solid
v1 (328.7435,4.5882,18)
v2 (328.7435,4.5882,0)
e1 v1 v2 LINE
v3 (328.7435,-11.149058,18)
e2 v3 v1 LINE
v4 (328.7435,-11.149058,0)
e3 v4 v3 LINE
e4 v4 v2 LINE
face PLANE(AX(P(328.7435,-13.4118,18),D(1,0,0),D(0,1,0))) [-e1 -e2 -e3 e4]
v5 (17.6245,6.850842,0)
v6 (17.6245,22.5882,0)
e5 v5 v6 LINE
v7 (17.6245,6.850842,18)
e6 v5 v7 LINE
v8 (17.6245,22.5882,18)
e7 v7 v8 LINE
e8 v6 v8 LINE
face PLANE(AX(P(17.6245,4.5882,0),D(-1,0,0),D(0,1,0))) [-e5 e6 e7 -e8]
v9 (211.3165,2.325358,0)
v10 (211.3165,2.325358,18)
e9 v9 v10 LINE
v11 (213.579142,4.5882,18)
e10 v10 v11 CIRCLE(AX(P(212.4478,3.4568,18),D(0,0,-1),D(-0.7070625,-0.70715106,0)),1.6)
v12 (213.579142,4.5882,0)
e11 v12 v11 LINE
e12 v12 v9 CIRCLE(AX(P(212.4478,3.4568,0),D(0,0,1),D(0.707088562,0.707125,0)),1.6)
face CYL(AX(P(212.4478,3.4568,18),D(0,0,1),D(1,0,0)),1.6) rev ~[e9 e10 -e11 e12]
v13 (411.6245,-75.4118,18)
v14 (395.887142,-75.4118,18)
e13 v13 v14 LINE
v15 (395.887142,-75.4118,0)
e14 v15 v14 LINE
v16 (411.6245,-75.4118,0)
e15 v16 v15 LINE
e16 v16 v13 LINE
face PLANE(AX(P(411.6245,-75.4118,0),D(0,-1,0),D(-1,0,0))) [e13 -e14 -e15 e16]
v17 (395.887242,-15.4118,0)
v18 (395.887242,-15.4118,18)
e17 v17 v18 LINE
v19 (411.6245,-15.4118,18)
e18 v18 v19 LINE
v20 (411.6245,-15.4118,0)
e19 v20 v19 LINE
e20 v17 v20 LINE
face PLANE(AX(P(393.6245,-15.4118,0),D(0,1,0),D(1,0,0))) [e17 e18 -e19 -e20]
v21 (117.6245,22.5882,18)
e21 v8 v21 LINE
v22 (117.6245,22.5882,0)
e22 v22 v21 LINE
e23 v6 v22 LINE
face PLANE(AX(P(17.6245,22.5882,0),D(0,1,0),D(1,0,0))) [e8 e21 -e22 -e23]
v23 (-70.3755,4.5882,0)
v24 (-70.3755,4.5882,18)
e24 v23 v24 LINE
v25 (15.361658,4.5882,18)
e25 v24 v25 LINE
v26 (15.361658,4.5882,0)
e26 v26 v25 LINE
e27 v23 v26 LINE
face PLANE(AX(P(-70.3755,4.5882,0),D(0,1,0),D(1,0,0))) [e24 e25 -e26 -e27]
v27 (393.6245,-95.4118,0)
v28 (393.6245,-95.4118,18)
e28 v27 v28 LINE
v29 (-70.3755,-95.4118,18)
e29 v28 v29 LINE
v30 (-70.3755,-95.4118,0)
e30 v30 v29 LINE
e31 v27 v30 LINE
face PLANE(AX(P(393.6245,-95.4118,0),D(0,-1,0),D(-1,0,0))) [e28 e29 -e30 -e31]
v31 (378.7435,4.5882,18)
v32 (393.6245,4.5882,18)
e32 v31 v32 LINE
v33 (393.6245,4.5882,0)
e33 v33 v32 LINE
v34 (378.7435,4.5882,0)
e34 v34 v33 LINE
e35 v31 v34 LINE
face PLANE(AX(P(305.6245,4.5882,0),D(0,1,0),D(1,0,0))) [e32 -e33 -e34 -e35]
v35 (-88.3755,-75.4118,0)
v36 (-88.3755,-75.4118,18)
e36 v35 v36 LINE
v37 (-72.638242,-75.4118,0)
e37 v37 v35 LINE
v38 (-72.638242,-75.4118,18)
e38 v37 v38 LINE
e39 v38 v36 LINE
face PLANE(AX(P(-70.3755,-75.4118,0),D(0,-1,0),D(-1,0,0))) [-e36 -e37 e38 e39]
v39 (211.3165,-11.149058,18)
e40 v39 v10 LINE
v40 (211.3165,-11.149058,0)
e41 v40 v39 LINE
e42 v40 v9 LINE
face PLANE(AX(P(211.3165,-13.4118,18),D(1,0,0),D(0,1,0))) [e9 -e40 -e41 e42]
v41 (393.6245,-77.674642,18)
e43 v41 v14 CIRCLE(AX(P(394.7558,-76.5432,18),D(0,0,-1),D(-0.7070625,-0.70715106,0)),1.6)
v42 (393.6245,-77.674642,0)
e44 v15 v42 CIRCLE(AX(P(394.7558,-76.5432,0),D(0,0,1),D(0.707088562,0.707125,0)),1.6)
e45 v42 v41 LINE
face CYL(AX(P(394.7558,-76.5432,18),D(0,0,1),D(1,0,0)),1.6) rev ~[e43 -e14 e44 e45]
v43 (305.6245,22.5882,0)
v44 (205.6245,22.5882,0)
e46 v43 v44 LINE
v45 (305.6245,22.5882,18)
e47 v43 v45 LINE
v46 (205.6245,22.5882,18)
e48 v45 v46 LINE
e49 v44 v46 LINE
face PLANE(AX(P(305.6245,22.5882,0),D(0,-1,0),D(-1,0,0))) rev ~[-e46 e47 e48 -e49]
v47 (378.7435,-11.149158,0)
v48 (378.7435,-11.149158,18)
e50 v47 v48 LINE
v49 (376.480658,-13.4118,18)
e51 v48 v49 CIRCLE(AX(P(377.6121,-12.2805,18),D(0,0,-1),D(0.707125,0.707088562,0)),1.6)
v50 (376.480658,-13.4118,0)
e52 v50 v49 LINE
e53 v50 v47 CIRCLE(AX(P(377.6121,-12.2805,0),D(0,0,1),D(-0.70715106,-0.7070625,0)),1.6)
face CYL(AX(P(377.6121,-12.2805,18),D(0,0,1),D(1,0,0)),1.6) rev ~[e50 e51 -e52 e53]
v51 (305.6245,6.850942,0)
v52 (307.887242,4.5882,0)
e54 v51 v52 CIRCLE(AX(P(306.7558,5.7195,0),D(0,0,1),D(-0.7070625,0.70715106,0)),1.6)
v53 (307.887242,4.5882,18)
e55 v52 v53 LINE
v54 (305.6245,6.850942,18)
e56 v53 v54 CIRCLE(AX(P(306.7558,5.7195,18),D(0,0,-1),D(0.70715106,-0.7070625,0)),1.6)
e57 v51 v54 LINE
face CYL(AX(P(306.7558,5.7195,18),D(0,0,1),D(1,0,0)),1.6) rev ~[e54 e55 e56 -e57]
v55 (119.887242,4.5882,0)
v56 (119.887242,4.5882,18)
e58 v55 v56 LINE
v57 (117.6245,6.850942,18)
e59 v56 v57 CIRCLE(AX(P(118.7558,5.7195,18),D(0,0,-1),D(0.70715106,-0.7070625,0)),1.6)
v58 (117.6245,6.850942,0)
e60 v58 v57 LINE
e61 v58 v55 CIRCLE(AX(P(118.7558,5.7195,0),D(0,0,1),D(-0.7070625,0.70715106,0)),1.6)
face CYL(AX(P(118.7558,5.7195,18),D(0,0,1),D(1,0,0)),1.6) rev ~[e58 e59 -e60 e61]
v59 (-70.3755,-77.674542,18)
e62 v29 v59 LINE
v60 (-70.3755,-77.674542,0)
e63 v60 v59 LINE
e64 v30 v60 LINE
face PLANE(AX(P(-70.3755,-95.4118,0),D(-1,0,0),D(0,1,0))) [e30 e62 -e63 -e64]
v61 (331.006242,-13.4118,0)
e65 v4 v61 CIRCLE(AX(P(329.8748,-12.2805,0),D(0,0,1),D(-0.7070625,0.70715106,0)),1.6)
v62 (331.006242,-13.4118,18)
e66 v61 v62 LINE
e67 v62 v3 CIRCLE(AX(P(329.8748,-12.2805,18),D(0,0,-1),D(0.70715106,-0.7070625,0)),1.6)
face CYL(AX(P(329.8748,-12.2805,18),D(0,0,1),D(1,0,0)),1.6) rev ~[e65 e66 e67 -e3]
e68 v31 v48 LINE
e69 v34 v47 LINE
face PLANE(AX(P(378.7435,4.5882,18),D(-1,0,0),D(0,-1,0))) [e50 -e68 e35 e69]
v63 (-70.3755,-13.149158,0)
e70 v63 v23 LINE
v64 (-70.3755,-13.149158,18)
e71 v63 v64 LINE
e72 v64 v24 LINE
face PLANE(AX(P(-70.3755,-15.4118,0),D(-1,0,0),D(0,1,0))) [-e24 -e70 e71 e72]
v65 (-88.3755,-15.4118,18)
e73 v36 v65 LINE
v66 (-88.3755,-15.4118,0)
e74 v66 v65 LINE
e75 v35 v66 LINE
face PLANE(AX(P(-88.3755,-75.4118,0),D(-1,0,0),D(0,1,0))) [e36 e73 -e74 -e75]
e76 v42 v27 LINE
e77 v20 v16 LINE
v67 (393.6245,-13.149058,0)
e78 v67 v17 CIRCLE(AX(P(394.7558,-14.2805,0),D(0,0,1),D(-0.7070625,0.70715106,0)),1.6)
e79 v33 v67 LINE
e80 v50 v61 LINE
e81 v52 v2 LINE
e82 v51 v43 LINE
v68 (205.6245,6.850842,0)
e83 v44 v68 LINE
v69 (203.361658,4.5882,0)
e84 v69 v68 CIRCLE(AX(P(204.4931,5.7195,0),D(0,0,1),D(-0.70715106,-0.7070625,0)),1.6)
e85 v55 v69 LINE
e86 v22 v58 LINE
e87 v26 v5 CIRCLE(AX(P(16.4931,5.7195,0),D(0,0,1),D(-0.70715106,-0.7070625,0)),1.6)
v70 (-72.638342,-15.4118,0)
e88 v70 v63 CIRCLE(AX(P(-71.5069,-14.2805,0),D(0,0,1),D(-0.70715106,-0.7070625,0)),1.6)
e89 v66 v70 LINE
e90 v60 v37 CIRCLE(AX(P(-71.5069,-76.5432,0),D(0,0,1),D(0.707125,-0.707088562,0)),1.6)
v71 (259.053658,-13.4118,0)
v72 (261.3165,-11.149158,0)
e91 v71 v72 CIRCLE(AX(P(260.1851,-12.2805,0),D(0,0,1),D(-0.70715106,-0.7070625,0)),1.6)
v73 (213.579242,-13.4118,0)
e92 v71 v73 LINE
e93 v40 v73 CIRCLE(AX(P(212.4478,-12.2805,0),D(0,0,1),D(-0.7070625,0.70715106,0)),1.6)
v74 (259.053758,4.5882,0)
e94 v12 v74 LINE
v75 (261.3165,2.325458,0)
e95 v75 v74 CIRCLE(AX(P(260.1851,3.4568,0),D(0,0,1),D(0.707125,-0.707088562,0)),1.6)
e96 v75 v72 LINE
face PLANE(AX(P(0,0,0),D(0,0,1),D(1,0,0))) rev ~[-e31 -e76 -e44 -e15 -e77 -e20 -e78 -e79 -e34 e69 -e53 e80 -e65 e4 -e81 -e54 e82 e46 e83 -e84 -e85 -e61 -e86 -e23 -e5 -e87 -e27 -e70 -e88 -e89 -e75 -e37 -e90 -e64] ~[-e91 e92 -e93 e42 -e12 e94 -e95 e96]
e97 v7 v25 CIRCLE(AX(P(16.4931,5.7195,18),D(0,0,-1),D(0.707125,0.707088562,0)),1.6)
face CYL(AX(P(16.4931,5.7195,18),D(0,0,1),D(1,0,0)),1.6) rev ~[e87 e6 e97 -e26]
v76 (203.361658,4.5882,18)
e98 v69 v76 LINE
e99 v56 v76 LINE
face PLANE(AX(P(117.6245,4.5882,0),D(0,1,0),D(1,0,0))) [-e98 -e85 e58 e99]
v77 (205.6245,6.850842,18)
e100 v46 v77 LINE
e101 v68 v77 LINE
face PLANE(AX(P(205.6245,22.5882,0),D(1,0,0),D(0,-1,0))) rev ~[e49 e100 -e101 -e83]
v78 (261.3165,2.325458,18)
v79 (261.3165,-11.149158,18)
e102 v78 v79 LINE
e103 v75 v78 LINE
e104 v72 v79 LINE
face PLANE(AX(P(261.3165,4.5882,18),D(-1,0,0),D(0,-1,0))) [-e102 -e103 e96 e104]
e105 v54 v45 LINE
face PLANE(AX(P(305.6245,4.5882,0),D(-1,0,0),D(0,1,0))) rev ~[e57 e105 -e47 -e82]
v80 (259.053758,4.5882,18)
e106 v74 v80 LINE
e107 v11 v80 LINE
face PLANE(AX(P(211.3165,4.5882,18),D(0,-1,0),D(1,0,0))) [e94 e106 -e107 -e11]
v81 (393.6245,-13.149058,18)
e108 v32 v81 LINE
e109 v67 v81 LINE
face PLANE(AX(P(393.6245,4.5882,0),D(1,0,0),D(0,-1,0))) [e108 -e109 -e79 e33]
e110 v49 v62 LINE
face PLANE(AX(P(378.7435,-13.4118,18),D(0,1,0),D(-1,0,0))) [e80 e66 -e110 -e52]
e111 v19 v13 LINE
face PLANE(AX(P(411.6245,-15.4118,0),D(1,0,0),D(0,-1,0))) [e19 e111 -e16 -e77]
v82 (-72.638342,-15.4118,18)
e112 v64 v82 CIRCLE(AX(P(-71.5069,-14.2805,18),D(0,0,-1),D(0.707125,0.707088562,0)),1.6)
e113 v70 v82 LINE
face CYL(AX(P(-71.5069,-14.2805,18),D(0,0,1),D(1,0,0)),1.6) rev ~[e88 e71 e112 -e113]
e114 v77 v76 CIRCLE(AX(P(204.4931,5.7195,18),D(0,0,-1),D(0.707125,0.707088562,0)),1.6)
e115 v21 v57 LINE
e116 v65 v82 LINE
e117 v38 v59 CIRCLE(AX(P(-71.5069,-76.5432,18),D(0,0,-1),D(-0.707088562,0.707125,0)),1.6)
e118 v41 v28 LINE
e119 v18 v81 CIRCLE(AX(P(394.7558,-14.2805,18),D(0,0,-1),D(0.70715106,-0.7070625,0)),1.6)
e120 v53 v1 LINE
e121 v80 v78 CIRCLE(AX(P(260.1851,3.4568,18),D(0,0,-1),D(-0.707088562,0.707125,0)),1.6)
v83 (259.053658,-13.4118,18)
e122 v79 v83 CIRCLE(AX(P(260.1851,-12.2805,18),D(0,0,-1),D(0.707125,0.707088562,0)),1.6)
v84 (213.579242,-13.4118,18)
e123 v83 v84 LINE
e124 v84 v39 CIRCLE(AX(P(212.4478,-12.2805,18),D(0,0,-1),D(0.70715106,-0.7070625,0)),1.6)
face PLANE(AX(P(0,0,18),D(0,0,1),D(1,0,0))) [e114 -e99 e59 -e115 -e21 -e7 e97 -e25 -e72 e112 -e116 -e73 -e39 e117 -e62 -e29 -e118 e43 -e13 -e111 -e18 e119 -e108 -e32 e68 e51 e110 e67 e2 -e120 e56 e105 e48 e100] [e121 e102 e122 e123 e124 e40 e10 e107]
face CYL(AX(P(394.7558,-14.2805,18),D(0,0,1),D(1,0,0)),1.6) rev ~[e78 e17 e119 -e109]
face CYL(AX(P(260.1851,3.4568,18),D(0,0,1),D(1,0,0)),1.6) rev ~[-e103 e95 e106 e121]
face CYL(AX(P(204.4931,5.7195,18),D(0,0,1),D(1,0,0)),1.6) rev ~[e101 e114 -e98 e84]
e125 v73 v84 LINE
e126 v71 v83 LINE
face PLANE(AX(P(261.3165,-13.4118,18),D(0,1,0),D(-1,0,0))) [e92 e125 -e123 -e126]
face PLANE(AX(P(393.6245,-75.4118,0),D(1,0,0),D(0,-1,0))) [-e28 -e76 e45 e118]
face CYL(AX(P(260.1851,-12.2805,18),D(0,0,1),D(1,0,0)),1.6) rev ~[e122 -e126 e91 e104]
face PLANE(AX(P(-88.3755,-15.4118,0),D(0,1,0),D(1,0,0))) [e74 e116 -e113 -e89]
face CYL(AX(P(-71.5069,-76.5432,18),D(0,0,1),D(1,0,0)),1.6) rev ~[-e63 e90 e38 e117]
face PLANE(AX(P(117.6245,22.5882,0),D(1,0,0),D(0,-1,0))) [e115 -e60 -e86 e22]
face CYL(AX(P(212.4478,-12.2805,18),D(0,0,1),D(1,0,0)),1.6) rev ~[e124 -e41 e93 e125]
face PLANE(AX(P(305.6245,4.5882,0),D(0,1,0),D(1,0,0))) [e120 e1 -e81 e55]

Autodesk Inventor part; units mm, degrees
ref_plane "YZ Plane" through (0, 0, 0) normal (1, 0, 0) x (0, 1, 0)
ref_plane "XZ Plane" through (0, 0, 0) normal (0, 1, 0) x (-1, 0, 0)
ref_plane "XY Plane" through (0, 0, 0) normal (0, 0, 1) x (1, 0, 0)
sketch "Sketch1" plane through (0, 0, 0) normal (0, 0, 1) x (1, 0, 0)
  line L0 (393.6245, -95.4118) -> (-70.3755, -95.4118)
  line L1 (17.6245, 22.5882) -> (117.6245, 22.5882)
  line L2 (117.6245, 22.5882) -> (117.6245, 4.5882)
  line L3 (17.6245, 4.5882) -> (17.6245, 22.5882)
  line L4 (-70.3755, 4.5882) -> (17.6245, 4.5882)
  line L5 (305.6245, 22.5882) -> (205.6245, 22.5882)
  line L6 (205.6245, 22.5882) -> (205.6245, 4.5882)
  line L7 (305.6245, 4.5882) -> (305.6245, 22.5882)
  line L8 (117.6245, 4.5882) -> (205.6245, 4.5882)
  line L9 (305.6245, 4.5882) -> (393.6245, 4.5882)
  line L10 (-88.3755, -15.4118) -> (-70.3755, -15.4118)
  line L11 (-70.3755, -75.4118) -> (-88.3755, -75.4118)
  line L12 (-88.3755, -75.4118) -> (-88.3755, -15.4118)
  line L13 (-70.3755, -95.4118) -> (-70.3755, -75.4118)
  line L14 (-70.3755, -15.4118) -> (-70.3755, 4.5882)
  line L15 (393.6245, -15.4118) -> (411.6245, -15.4118)
  line L16 (411.6245, -15.4118) -> (411.6245, -75.4118)
  line L17 (411.6245, -75.4118) -> (393.6245, -75.4118)
  line L18 (393.6245, 4.5882) -> (393.6245, -15.4118)
  line L19 (393.6245, -75.4118) -> (393.6245, -95.4118)
  point P0 (0, 0)
  dimension "d0" = 464
  dimension "d4" = 100
  dimension "d5" = 18
  dimension "d9" = 100
  dimension "d10" = 18
  dimension "d13" = 18
  dimension "d14" = 60
  dimension "d17" = 20
  dimension "d19" = 60
  dimension "d20" = 18
  dimension "d21" = 100
  dimension "d37" = 88
  dimension "d38" = 88
  dimension "d39" = 88
extrude "Extrusion1" add sketch "Sketch1" along normal blind 18
sketch "Sketch2" plane through (0, 0, 18) normal (0, 0, 1) x (1, 0, 0)
  line L0 (-70.3755, -15.4118) -> (-71.5069, -14.2805)
  line L1 (-70.3755, -15.4118) -> (-68.7755, -15.4118) construction
  line L2 (-70.3755, -75.4118) -> (-71.5069, -76.5432)
  line L3 (17.6245, 4.5882) -> (16.4931, 5.7195)
  line L4 (17.6245, 4.5882) -> (19.2245, 4.5882) construction
  line L5 (117.6245, 4.5882) -> (118.7558, 5.7195)
  line L6 (205.6245, 4.5882) -> (204.4931, 5.7195)
  line L7 (305.6245, 4.5882) -> (306.7558, 5.7195)
  line L8 (393.6245, -15.4118) -> (394.7558, -14.2805)
  line L9 (393.6245, -75.4118) -> (394.7558, -76.5432)
  circle A0 centre (-71.5069, -14.2805) radius 1.6
  circle A1 centre (-71.5069, -76.5432) radius 1.6
  circle A2 centre (16.4931, 5.7195) radius 1.6
  circle A3 centre (118.7558, 5.7195) radius 1.6
  circle A4 centre (204.4931, 5.7195) radius 1.6
  circle A5 centre (306.7558, 5.7195) radius 1.6
  circle A6 centre (394.7558, -14.2805) radius 1.6
  circle A7 centre (394.7558, -76.5432) radius 1.6
  point P0 (0, 0)
  dimension "d22" = 1.6
  dimension "d23" = 135
  dimension "d24" = 1.6
  dimension "d25" = 135
  dimension "d26" = 3.2
  dimension "d27" = 3.2
  dimension "d28" = 3.2
  dimension "d29" = 3.2
  dimension "d30" = 3.2
  dimension "d32" = 3.2
  dimension "d33" = 3.2
  dimension "d34" = 3.2
extrude "Extrusion2" cut sketch "Sketch2" against normal blind 20
sketch "Sketch3" plane through (0, 0, 18) normal (0, 0, 1) x (1, 0, 0)
  line L0 (211.3165, 4.5882) -> (261.3165, 4.5882)
  line L1 (261.3165, 4.5882) -> (261.3165, -13.4118)
  line L2 (261.3165, -13.4118) -> (211.3165, -13.4118)
  line L3 (211.3165, -13.4118) -> (211.3165, 4.5882)
  line L4 (305.6245, 22.5882) -> (205.6245, 22.5882) projected
  line L5 (205.6245, 22.5882) -> (205.6245, 6.8509) projected
  line L6 (328.7435, 4.5882) -> (378.7435, 4.5882)
  line L7 (378.7435, 4.5882) -> (378.7435, -13.4118)
  line L8 (378.7435, -13.4118) -> (328.7435, -13.4118)
  line L9 (328.7435, -13.4118) -> (328.7435, 4.5882)
  line L10 (393.6245, 4.5882) -> (307.8872, 4.5882) projected
  point P0 (0, 0)
  dimension "d40" = 50
  dimension "d41" = 18
  dimension "d42" = 18
  dimension "d43" = 5.692
  dimension "d44" = 50
  dimension "d45" = 18
  dimension "d46" = 67.427
  dimension "d47" = 0
extrude "Extrusion3" cut sketch "Sketch3" against normal blind 18
sketch "Sketch4" plane through (0, 0, 18) normal (0, 0, 1) x (1, 0, 0)
  line L0 (211.3165, 4.5882) -> (212.4478, 3.4568)
  line L1 (211.3165, 4.5882) -> (212.9165, 4.5882) construction
  line L2 (211.3165, -13.4118) -> (212.4478, -12.2805)
  line L3 (211.3165, -13.4118) -> (212.9165, -13.4118) construction
  line L4 (261.3165, -13.4118) -> (260.1851, -12.2805)
  line L5 (261.3165, 4.5882) -> (260.1851, 3.4568)
  circle A0 centre (212.4478, 3.4568) radius 1.6
  circle A1 centre (212.4478, -12.2805) radius 1.6
  circle A2 centre (260.1851, 3.4568) radius 1.6
  circle A3 centre (260.1851, -12.2805) radius 1.6
  line L6 (328.7435, -13.4118) -> (329.8748, -12.2805)
  line L7 (328.7435, -13.4118) -> (330.3435, -13.4118) construction
  line L8 (378.7435, -13.4118) -> (377.6121, -12.2805)
  circle A4 centre (377.6121, -12.2805) radius 1.6
  circle A5 centre (329.8748, -12.2805) radius 1.6
  point P0 (0, 0)
  dimension "d50" = 1.6
  dimension "d51" = 45
  dimension "d52" = 1.6
  dimension "d53" = 45
  dimension "d54" = 3.2
  dimension "d55" = 3.2
  dimension "d56" = 3.2
  dimension "d57" = 3.2
  dimension "d58" = 1.6
  dimension "d59" = 45
  dimension "d60" = 3.2
  dimension "d61" = 3.2
extrude "Extrusion4" cut sketch "Sketch4" against normal blind 20
properties part number "laterales" material "Wood (Birch)"
